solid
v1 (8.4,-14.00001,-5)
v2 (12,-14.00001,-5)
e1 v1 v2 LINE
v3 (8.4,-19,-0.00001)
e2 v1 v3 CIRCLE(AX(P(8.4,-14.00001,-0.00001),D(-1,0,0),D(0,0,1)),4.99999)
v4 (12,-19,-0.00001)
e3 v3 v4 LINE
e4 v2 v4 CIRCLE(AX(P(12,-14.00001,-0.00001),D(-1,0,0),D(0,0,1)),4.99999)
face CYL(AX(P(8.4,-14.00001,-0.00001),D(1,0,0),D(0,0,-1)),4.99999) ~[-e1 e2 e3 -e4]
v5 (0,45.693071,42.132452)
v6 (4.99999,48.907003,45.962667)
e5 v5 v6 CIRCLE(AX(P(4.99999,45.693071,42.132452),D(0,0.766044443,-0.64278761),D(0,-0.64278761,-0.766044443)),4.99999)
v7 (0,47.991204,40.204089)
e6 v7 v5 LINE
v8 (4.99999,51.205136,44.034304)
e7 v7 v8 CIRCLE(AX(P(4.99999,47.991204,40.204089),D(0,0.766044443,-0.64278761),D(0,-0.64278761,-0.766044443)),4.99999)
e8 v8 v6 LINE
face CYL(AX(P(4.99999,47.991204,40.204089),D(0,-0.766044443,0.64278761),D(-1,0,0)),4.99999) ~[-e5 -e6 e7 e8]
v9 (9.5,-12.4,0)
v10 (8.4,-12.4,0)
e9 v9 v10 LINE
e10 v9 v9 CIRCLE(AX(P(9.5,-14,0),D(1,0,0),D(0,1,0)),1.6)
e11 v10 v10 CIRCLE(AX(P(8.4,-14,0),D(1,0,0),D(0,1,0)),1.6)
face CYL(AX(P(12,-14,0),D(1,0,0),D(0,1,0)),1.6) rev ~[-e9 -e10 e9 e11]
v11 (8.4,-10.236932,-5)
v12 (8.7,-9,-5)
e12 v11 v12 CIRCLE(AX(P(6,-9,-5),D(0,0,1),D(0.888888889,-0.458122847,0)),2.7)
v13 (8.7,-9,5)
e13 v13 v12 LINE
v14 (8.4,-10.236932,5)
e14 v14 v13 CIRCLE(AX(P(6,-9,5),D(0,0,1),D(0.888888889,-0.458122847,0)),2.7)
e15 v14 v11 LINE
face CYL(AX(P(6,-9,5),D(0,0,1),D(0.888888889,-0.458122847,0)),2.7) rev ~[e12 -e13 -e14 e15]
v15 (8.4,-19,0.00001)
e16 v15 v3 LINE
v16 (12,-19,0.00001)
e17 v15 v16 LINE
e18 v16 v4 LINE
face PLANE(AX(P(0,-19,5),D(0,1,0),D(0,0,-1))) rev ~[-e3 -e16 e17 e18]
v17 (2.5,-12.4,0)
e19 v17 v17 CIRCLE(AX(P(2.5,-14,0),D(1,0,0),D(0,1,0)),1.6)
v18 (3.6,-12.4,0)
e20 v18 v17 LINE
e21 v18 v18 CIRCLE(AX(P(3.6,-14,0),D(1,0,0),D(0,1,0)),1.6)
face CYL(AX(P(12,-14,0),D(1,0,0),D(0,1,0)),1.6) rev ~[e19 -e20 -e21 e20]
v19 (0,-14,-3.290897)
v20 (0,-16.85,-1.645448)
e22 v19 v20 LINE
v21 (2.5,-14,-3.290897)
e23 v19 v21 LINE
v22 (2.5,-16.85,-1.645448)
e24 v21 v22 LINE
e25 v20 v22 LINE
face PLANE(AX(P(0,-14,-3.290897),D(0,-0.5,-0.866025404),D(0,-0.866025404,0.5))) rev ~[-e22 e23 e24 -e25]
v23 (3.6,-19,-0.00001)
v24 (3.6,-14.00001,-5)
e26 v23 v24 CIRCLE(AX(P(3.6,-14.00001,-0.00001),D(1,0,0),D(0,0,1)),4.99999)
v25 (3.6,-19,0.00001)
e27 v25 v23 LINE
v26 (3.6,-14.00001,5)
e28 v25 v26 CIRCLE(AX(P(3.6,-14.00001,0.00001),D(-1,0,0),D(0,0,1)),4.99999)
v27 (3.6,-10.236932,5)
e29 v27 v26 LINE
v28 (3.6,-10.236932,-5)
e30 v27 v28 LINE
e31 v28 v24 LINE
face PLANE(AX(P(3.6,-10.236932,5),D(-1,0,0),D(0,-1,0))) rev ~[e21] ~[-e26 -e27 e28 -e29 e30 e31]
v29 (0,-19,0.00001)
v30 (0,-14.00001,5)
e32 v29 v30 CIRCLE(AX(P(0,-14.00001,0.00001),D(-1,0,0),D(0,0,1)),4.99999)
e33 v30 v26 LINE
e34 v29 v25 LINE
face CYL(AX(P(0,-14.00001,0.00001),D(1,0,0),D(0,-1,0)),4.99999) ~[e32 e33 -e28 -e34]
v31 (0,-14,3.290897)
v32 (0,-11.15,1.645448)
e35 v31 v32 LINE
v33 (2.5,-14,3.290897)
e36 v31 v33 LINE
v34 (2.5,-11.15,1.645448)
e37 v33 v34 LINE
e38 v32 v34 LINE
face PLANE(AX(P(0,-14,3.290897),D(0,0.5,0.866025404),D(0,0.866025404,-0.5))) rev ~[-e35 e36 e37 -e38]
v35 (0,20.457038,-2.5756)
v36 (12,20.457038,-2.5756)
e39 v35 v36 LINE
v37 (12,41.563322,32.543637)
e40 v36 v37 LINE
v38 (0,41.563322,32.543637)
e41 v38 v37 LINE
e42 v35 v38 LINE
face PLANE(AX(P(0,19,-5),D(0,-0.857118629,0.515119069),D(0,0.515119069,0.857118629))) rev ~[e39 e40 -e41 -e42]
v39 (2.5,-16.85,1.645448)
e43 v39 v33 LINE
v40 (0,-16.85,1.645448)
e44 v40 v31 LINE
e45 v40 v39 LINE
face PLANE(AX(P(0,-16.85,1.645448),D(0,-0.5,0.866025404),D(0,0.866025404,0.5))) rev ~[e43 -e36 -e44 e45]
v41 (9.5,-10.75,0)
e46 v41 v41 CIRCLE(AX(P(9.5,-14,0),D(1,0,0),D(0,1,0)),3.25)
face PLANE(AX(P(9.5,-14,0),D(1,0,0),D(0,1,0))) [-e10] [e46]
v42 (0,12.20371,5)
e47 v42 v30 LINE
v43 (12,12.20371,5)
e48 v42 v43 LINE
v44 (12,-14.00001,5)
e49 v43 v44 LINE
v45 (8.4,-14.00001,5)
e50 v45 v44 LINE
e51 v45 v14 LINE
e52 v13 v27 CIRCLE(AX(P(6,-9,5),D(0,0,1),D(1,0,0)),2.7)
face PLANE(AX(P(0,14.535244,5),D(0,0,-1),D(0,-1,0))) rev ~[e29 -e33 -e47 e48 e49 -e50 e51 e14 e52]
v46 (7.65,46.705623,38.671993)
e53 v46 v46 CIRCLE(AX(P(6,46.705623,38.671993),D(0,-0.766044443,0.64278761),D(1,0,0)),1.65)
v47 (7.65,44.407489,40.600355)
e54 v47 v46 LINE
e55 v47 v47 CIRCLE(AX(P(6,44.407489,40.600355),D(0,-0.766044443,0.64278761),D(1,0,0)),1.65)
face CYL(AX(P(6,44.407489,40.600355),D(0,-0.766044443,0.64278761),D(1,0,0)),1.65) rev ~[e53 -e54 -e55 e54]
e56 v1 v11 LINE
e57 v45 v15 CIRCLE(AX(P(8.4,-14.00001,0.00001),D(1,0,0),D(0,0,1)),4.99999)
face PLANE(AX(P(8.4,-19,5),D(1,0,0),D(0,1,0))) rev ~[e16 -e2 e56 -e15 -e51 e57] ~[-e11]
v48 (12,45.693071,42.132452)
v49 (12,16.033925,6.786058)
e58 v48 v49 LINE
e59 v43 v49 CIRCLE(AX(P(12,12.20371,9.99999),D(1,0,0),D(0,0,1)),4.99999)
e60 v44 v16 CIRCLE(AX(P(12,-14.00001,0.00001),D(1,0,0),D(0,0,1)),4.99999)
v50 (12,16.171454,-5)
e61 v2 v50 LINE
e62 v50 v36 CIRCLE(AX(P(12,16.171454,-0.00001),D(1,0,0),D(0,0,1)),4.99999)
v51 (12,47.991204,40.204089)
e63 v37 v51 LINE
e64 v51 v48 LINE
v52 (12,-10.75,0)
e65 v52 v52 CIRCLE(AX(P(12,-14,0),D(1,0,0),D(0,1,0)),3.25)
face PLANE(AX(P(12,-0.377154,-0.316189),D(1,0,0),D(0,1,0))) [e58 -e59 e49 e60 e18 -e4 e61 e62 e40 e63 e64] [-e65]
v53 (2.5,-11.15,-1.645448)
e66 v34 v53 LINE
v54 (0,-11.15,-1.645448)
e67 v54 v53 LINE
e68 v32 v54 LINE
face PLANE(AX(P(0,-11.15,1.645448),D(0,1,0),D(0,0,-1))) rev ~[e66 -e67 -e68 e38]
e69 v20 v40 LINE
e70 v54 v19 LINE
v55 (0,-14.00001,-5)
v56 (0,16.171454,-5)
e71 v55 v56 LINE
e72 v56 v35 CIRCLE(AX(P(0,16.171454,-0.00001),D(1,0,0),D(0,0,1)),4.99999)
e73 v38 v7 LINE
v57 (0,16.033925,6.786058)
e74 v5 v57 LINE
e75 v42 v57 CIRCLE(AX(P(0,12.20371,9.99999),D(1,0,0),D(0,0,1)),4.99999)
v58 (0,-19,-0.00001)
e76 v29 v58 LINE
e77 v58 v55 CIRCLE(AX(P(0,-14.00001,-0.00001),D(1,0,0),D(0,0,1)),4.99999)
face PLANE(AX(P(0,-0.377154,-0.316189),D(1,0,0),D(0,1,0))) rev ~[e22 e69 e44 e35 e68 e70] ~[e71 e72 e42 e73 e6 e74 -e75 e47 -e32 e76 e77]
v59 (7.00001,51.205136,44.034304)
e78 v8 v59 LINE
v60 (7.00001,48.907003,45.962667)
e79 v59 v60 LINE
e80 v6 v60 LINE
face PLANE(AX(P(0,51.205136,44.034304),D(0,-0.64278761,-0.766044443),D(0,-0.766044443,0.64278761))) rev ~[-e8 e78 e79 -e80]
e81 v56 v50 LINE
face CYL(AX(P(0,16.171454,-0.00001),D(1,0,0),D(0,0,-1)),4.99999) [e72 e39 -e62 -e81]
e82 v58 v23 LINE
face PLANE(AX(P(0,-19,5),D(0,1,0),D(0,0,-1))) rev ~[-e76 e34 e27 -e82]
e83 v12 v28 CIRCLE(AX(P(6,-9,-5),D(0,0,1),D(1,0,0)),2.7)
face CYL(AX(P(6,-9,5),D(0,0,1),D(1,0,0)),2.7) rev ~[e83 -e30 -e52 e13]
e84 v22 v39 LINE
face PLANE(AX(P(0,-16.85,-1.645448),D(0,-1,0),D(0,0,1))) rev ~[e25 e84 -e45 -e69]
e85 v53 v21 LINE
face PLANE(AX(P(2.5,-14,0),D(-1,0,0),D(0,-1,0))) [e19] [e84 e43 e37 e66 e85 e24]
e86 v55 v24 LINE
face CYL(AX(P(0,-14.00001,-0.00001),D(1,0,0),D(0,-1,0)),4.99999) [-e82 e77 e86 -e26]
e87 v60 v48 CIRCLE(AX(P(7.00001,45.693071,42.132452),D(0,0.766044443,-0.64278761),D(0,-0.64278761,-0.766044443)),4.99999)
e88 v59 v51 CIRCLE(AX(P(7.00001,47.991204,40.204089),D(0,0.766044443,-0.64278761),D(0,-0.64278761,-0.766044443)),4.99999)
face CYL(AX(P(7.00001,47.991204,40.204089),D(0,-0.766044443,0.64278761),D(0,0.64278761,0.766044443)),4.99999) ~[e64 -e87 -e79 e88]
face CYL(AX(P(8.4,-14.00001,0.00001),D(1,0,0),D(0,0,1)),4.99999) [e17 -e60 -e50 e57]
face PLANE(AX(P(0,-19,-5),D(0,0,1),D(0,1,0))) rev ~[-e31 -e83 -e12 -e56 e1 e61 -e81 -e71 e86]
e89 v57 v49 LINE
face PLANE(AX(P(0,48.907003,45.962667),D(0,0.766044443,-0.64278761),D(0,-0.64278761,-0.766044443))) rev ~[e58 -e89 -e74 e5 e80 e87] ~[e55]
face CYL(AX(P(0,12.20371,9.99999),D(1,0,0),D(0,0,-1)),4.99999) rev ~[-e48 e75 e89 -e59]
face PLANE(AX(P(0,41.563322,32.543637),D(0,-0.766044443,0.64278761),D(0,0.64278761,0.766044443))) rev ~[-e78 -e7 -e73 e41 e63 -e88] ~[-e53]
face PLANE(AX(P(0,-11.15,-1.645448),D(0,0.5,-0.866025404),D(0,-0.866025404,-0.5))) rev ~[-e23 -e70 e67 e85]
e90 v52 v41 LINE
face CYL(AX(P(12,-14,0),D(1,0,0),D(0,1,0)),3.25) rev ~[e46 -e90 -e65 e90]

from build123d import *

# Parameters (mm, degrees)
F1_DEPTH  = 12
F3_DEPTH  = 25
F4_R      = 1.6
F5_DEPTH  = 12.001
F4_R_2    = 3.25
F6_DEPTH  = 2.5
F8_DEPTH  = 2.5
F9_R      = 1.65
F10_DEPTH = 34.5196429053
F11_R     = 4.99999


# Not quite as in the source:
# - a fillet or chamfer is up to 0.001 mm smaller than in the source, because OpenCascade refuses the exact size


with BuildPart() as f1:
    # F0 (on Right) → F1 (new body)
    with BuildSketch(Plane.YZ):
        Polygon((-19, 5), (-19, -5), (19, -5), (10.3397459622, 0), (14.535244118, 5), align=None)
        Polygon((10.3397459622, 0), (19, -5), (19, 5), (14.535244118, 5), align=None)
        Polygon((19, 5), (19, -5), (41.5633217274, 32.5436371113), (51.2051358727, 44.0343037581), (48.9070025433, 45.9626665871), (14.535244118, 5), align=None)
    extrude(amount=F1_DEPTH)

    # F2 (on face) → F3 (cut)
    with BuildSketch(Plane.XY.offset(5)):
        with BuildLine():
            ThreePointArc((8.4, -10.2369316877), (8.6239283527, -9.6363961031), (8.7, -9))
            ThreePointArc((8.7, -9), (5.3636038969, -6.3760716473), (3.6, -10.2369316877))
            Line((3.6, -10.2369316877), (8.4, -10.2369316877))
        make_face()
        with BuildLine():
            Line((8.4, -10.2369316877), (3.6, -10.2369316877))
            ThreePointArc((3.6, -10.2369316877), (6, -11.7), (8.4, -10.2369316877))
        make_face()
        with BuildLine():
            ThreePointArc((8.4, -10.2369316877), (6, -11.7), (3.6, -10.2369316877))
            Line((3.6, -10.2369316877), (3.6, -19))
            Line((3.6, -19), (8.4, -19))
            Line((8.4, -19), (8.4, -10.2369316877))
        make_face()
    extrude(amount=-F3_DEPTH, mode=Mode.SUBTRACT)

    # F4 (on face) → F5 (cut, through all)
    with BuildSketch(Plane.YZ.offset(12)):
        with Locations((-14, 0)):
            Circle(F4_R)
    extrude(amount=-F5_DEPTH, mode=Mode.SUBTRACT)

    # F4 (on face) → F6 (cut)
    with BuildSketch(Plane.YZ.offset(12)):
        with Locations((-14, 0)):
            Circle(F4_R_2)
        with Locations((-14, 0)):
            Circle(F4_R, mode=Mode.SUBTRACT)
    extrude(amount=-F6_DEPTH, mode=Mode.SUBTRACT)

    # F7 (on face) → F8 (cut)
    with BuildSketch(Plane(origin=(0, 0, 0), x_dir=(0, -1, 0), z_dir=(-1, 0, 0))):
        Polygon((11.15, 1.6454482672), (11.15, -1.6454482672), (14, -3.2908965344), (16.85, -1.6454482672), (16.85, 1.6454482672), (14, 3.2908965344), align=None)
    extrude(amount=-F8_DEPTH, mode=Mode.SUBTRACT)

    # F9 (on face) → F10 (cut, through all)
    with BuildSketch(Plane(origin=(0, 6.067612003, -5.0913309939), x_dir=(1, 0, 0), z_dir=(0, -0.7660444431, 0.6427876097))):
        with Locations((6, 59.6462605918)):
            Circle(F9_R)
    extrude(amount=-F10_DEPTH, mode=Mode.SUBTRACT)

    # F11 (radius 5 in the source; OpenCascade refuses exactly that, so slightly less here)
    f11_edges = [f1.edges().sort_by_distance(p)[0] for p in [
        (1.8, -19, 5),
        (10.2, -19, 5),
        (1.8, -19, -5),
        (10.2, -19, -5),
        (12, 50.056069, 44.998485),
        (0, 50.056069, 44.998485),
        (6, 14.535244, 5),
        (6, 19, -5),
    ]]
    fillet(f11_edges, radius=F11_R)


solid = f1.part
